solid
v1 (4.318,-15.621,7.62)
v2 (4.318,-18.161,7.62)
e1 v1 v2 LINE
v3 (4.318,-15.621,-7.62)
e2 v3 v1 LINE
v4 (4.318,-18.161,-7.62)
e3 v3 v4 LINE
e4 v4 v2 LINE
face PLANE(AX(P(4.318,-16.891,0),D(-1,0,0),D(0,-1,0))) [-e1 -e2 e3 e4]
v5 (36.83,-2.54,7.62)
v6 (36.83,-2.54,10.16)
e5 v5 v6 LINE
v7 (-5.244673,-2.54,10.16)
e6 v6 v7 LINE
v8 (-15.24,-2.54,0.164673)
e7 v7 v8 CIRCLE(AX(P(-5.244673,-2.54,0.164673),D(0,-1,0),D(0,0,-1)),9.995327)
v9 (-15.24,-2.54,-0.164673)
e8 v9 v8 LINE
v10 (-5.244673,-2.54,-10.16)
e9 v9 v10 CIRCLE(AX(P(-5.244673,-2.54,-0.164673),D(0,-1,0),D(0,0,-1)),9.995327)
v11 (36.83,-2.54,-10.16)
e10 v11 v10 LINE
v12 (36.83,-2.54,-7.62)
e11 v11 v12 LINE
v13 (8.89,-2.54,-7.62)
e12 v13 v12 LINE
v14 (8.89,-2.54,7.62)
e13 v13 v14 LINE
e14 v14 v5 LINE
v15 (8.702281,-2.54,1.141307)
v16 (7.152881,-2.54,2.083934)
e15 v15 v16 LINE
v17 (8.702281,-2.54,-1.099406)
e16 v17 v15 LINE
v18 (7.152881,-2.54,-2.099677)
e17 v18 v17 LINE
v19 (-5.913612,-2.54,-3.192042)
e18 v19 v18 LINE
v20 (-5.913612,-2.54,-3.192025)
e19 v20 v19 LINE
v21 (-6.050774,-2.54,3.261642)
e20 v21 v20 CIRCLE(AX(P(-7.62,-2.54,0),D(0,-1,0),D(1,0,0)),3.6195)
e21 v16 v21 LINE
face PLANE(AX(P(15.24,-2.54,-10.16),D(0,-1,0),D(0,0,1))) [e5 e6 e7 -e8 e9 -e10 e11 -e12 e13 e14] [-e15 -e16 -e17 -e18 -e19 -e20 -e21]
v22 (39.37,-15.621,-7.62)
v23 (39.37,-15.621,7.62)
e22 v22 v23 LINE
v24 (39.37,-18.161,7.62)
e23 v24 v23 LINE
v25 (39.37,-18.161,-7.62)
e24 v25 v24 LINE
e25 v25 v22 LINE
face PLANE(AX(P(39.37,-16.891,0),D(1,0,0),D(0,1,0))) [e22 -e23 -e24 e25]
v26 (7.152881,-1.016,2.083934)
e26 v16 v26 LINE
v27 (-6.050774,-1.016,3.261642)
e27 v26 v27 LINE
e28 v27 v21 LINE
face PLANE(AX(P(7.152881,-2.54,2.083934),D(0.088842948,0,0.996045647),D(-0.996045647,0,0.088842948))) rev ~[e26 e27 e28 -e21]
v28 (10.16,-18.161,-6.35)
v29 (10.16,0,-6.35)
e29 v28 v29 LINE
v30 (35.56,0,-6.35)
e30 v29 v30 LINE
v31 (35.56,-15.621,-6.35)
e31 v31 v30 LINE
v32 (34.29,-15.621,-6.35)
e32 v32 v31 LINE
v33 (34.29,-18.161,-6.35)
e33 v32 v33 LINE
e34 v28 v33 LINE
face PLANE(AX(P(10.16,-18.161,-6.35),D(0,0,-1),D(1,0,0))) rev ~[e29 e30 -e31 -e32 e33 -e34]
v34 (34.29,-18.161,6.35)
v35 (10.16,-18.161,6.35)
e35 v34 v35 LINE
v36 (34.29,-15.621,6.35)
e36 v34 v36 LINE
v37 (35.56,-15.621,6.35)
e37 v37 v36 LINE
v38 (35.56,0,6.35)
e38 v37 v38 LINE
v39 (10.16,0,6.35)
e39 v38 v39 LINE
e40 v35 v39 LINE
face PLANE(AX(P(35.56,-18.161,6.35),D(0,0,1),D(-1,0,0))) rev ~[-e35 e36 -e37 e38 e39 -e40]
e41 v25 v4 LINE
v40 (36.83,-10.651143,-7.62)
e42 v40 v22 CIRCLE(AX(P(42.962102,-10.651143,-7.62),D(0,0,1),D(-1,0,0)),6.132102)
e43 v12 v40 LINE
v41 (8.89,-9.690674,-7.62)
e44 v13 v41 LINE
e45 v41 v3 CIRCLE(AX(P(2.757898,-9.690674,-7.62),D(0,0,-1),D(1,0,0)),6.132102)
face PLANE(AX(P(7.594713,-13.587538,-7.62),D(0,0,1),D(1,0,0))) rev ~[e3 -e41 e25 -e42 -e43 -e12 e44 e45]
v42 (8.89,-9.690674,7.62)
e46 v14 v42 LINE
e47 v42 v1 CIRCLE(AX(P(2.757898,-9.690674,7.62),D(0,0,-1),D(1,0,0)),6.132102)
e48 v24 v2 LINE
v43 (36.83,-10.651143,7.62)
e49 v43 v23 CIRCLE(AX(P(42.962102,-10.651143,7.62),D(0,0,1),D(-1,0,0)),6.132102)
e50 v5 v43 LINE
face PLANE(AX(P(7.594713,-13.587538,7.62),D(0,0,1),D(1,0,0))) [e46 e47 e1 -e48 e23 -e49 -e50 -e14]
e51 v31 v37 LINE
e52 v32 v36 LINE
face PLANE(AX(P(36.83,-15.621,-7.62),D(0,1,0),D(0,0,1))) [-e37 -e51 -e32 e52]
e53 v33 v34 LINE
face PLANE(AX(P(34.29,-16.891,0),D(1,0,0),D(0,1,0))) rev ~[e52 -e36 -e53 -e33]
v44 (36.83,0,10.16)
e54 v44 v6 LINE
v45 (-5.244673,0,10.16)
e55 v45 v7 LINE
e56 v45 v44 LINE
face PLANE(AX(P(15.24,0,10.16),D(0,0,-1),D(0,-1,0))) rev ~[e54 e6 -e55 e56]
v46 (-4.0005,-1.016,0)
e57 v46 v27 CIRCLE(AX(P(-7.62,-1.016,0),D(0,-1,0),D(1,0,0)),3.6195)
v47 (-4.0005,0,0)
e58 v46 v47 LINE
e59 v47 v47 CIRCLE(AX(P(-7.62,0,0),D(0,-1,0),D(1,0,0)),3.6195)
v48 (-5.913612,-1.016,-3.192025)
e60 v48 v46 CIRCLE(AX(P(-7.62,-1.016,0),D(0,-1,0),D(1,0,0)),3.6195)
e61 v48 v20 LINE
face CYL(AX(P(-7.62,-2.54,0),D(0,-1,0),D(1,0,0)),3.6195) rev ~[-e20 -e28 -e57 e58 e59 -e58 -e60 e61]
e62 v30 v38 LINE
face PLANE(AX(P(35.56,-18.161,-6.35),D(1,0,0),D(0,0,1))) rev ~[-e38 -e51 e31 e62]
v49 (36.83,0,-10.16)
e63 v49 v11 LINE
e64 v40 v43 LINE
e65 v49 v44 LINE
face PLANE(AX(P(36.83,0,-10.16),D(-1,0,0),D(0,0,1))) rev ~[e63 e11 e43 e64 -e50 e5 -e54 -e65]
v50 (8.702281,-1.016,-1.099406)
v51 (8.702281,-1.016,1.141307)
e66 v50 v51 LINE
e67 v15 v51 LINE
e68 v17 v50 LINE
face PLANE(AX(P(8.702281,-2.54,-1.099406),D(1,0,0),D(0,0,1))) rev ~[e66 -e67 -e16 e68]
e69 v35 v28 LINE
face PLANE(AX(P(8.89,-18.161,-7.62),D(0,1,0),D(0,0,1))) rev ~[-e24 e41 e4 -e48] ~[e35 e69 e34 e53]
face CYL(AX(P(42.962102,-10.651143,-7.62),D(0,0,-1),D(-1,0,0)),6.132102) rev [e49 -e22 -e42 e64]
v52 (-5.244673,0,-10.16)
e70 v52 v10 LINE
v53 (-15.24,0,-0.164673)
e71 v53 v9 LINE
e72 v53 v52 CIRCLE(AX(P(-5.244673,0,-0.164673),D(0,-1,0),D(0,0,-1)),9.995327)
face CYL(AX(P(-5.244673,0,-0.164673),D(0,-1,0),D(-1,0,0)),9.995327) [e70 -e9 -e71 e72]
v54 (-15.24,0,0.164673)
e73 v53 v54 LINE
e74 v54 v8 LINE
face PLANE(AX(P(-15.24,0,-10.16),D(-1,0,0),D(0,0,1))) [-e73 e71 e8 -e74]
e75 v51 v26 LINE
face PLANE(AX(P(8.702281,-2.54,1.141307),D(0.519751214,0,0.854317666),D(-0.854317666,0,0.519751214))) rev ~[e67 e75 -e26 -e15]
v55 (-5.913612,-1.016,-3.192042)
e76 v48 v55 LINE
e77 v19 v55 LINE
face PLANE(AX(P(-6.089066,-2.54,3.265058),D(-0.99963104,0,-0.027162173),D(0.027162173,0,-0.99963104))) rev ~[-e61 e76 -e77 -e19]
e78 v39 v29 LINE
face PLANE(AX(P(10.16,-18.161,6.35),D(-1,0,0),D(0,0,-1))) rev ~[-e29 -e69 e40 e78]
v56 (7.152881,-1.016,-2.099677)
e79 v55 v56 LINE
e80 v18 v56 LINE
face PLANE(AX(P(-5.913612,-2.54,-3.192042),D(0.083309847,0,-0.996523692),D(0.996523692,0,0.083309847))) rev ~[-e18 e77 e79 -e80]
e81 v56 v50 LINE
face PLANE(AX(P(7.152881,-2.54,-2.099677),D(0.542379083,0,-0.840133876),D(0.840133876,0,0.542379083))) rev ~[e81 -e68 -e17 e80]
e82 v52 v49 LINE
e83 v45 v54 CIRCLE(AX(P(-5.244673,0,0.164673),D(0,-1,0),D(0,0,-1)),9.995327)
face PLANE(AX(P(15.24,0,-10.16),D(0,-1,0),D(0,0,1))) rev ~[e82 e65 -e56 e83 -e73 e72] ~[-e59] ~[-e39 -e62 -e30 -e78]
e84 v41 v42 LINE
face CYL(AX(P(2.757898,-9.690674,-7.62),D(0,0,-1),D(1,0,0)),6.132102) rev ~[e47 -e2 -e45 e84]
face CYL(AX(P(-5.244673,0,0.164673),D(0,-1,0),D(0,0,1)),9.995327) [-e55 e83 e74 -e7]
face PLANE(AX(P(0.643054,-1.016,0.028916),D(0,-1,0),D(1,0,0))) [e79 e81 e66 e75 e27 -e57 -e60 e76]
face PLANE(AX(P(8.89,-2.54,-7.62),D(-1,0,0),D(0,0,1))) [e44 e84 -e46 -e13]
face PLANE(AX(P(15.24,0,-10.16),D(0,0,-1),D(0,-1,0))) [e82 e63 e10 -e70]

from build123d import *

# Parameters (mm, degrees)
F0_W         = 30.48
F0_H         = 20.32
F1_DEPTH     = 2.54
F2_R         = 3.6195
F4_DEPTH     = 25.4
F5_DEPTH     = 1.524
F6_DEPTH     = 21.59
F7_W         = 27.94
F7_H         = 15.24
F8_DEPTH     = 15.621
F10_DEPTH    = 25.4
F11_W        = 2.54
F11_H        = 15.24
F12_DEPTH    = 4.572
F13_W        = 2.54
F13_H        = 15.24
F14_DEPTH    = 2.54
F15_R        = 9.9953269909
F16_T1_DEPTH = 15.24


# Not quite as in the source:
# - a fillet or chamfer that OpenCascade refuses, or shapes differently, is made with other operations: its cross-section is extruded or revolved along the edge and cut away or added


with BuildPart() as f1:
    # F0 (on Front) → F1 (new body)
    with BuildSketch(Plane.XZ):
        Rectangle(F0_W, F0_H)
    extrude(amount=F1_DEPTH)

    # F2 (on face) → F4 (cut)
    with BuildSketch(Plane.XZ.offset(2.54)):
        with Locations((-7.62, 0)):
            Circle(F2_R)
    extrude(amount=-F4_DEPTH, mode=Mode.SUBTRACT)

    # F3 (on face) → F5 (cut)
    with BuildSketch(Plane.XZ.offset(2.54)):
        Polygon((7.1528805111, 2.0839335623), (-6.0890655676, 3.2650576724), (-5.9136119671, -3.1920422334), (7.1528805111, -2.0996773468), (8.7022805111, -1.0994056345), (8.7022805111, 1.1413069921), align=None)
    extrude(amount=-F5_DEPTH, mode=Mode.SUBTRACT)

    # F6 (add): a face of the model
    f6_faces = [f1.faces().sort_by_distance(p)[0] for p in [
        (15.24, -1.27, 0),
    ]]
    extrude(f6_faces, amount=F6_DEPTH)

    # F7 (on face) → F8 (join)
    with BuildSketch(Plane.XZ.offset(2.54)):
        with Locations((22.86, 0)):
            Rectangle(F7_W, F7_H)
    extrude(amount=F8_DEPTH)

    # F9 (on face) → F10 (cut)
    with BuildSketch(Plane.XZ.offset(18.161)):
        Polygon((10.16, 6.35), (10.16, -6.35), (35.56, -6.35), (35.56, 0), (35.56, 6.35), align=None)
    extrude(amount=-F10_DEPTH, mode=Mode.SUBTRACT)

    # F11 (on face) → F12 (join)
    with BuildSketch(Plane(origin=(8.89, 0, 0), x_dir=(0, -1, 0), z_dir=(-1, 0, 0))):
        with Locations((16.891, 0)):
            Rectangle(F11_W, F11_H)
    extrude(amount=F12_DEPTH)

    # F13 (on face) → F14 (join, symmetric)
    with BuildSketch(Plane.YZ.offset(36.83)):
        with Locations((-16.891, 0)):
            Rectangle(F13_W, F13_H)
    extrude(amount=F14_DEPTH, both=True)

    # F15
    f15_edges = [f1.edges().sort_by_distance(p)[0] for p in [
        (-15.24, -1.27, 10.16),
        (-15.24, -1.27, -10.16),
    ]]
    fillet(f15_edges, radius=F15_R)

    # F16: fillet of radius 6.1321024484 on 2 edges, made by hand

    # F16_s2 → F16_t1 (join)
    with BuildSketch(Plane.XY.offset(-7.62)):
        with BuildLine():
            ThreePointArc((8.89, -9.6906744787), (7.6143050963, -13.4347346007), (4.318, -15.621))
            Line((4.318, -15.621), (8.89, -15.621))
            Line((8.89, -15.621), (8.89, -9.6906744787))
        make_face()
        with BuildLine():
            ThreePointArc((36.83, -10.6511428151), (37.5017993132, -13.4418004633), (39.37, -15.621))
            Line((39.37, -15.621), (36.83, -15.621))
            Line((36.83, -15.621), (36.83, -10.6511428151))
        make_face()
    extrude(amount=F16_T1_DEPTH)


solid = f1.part
